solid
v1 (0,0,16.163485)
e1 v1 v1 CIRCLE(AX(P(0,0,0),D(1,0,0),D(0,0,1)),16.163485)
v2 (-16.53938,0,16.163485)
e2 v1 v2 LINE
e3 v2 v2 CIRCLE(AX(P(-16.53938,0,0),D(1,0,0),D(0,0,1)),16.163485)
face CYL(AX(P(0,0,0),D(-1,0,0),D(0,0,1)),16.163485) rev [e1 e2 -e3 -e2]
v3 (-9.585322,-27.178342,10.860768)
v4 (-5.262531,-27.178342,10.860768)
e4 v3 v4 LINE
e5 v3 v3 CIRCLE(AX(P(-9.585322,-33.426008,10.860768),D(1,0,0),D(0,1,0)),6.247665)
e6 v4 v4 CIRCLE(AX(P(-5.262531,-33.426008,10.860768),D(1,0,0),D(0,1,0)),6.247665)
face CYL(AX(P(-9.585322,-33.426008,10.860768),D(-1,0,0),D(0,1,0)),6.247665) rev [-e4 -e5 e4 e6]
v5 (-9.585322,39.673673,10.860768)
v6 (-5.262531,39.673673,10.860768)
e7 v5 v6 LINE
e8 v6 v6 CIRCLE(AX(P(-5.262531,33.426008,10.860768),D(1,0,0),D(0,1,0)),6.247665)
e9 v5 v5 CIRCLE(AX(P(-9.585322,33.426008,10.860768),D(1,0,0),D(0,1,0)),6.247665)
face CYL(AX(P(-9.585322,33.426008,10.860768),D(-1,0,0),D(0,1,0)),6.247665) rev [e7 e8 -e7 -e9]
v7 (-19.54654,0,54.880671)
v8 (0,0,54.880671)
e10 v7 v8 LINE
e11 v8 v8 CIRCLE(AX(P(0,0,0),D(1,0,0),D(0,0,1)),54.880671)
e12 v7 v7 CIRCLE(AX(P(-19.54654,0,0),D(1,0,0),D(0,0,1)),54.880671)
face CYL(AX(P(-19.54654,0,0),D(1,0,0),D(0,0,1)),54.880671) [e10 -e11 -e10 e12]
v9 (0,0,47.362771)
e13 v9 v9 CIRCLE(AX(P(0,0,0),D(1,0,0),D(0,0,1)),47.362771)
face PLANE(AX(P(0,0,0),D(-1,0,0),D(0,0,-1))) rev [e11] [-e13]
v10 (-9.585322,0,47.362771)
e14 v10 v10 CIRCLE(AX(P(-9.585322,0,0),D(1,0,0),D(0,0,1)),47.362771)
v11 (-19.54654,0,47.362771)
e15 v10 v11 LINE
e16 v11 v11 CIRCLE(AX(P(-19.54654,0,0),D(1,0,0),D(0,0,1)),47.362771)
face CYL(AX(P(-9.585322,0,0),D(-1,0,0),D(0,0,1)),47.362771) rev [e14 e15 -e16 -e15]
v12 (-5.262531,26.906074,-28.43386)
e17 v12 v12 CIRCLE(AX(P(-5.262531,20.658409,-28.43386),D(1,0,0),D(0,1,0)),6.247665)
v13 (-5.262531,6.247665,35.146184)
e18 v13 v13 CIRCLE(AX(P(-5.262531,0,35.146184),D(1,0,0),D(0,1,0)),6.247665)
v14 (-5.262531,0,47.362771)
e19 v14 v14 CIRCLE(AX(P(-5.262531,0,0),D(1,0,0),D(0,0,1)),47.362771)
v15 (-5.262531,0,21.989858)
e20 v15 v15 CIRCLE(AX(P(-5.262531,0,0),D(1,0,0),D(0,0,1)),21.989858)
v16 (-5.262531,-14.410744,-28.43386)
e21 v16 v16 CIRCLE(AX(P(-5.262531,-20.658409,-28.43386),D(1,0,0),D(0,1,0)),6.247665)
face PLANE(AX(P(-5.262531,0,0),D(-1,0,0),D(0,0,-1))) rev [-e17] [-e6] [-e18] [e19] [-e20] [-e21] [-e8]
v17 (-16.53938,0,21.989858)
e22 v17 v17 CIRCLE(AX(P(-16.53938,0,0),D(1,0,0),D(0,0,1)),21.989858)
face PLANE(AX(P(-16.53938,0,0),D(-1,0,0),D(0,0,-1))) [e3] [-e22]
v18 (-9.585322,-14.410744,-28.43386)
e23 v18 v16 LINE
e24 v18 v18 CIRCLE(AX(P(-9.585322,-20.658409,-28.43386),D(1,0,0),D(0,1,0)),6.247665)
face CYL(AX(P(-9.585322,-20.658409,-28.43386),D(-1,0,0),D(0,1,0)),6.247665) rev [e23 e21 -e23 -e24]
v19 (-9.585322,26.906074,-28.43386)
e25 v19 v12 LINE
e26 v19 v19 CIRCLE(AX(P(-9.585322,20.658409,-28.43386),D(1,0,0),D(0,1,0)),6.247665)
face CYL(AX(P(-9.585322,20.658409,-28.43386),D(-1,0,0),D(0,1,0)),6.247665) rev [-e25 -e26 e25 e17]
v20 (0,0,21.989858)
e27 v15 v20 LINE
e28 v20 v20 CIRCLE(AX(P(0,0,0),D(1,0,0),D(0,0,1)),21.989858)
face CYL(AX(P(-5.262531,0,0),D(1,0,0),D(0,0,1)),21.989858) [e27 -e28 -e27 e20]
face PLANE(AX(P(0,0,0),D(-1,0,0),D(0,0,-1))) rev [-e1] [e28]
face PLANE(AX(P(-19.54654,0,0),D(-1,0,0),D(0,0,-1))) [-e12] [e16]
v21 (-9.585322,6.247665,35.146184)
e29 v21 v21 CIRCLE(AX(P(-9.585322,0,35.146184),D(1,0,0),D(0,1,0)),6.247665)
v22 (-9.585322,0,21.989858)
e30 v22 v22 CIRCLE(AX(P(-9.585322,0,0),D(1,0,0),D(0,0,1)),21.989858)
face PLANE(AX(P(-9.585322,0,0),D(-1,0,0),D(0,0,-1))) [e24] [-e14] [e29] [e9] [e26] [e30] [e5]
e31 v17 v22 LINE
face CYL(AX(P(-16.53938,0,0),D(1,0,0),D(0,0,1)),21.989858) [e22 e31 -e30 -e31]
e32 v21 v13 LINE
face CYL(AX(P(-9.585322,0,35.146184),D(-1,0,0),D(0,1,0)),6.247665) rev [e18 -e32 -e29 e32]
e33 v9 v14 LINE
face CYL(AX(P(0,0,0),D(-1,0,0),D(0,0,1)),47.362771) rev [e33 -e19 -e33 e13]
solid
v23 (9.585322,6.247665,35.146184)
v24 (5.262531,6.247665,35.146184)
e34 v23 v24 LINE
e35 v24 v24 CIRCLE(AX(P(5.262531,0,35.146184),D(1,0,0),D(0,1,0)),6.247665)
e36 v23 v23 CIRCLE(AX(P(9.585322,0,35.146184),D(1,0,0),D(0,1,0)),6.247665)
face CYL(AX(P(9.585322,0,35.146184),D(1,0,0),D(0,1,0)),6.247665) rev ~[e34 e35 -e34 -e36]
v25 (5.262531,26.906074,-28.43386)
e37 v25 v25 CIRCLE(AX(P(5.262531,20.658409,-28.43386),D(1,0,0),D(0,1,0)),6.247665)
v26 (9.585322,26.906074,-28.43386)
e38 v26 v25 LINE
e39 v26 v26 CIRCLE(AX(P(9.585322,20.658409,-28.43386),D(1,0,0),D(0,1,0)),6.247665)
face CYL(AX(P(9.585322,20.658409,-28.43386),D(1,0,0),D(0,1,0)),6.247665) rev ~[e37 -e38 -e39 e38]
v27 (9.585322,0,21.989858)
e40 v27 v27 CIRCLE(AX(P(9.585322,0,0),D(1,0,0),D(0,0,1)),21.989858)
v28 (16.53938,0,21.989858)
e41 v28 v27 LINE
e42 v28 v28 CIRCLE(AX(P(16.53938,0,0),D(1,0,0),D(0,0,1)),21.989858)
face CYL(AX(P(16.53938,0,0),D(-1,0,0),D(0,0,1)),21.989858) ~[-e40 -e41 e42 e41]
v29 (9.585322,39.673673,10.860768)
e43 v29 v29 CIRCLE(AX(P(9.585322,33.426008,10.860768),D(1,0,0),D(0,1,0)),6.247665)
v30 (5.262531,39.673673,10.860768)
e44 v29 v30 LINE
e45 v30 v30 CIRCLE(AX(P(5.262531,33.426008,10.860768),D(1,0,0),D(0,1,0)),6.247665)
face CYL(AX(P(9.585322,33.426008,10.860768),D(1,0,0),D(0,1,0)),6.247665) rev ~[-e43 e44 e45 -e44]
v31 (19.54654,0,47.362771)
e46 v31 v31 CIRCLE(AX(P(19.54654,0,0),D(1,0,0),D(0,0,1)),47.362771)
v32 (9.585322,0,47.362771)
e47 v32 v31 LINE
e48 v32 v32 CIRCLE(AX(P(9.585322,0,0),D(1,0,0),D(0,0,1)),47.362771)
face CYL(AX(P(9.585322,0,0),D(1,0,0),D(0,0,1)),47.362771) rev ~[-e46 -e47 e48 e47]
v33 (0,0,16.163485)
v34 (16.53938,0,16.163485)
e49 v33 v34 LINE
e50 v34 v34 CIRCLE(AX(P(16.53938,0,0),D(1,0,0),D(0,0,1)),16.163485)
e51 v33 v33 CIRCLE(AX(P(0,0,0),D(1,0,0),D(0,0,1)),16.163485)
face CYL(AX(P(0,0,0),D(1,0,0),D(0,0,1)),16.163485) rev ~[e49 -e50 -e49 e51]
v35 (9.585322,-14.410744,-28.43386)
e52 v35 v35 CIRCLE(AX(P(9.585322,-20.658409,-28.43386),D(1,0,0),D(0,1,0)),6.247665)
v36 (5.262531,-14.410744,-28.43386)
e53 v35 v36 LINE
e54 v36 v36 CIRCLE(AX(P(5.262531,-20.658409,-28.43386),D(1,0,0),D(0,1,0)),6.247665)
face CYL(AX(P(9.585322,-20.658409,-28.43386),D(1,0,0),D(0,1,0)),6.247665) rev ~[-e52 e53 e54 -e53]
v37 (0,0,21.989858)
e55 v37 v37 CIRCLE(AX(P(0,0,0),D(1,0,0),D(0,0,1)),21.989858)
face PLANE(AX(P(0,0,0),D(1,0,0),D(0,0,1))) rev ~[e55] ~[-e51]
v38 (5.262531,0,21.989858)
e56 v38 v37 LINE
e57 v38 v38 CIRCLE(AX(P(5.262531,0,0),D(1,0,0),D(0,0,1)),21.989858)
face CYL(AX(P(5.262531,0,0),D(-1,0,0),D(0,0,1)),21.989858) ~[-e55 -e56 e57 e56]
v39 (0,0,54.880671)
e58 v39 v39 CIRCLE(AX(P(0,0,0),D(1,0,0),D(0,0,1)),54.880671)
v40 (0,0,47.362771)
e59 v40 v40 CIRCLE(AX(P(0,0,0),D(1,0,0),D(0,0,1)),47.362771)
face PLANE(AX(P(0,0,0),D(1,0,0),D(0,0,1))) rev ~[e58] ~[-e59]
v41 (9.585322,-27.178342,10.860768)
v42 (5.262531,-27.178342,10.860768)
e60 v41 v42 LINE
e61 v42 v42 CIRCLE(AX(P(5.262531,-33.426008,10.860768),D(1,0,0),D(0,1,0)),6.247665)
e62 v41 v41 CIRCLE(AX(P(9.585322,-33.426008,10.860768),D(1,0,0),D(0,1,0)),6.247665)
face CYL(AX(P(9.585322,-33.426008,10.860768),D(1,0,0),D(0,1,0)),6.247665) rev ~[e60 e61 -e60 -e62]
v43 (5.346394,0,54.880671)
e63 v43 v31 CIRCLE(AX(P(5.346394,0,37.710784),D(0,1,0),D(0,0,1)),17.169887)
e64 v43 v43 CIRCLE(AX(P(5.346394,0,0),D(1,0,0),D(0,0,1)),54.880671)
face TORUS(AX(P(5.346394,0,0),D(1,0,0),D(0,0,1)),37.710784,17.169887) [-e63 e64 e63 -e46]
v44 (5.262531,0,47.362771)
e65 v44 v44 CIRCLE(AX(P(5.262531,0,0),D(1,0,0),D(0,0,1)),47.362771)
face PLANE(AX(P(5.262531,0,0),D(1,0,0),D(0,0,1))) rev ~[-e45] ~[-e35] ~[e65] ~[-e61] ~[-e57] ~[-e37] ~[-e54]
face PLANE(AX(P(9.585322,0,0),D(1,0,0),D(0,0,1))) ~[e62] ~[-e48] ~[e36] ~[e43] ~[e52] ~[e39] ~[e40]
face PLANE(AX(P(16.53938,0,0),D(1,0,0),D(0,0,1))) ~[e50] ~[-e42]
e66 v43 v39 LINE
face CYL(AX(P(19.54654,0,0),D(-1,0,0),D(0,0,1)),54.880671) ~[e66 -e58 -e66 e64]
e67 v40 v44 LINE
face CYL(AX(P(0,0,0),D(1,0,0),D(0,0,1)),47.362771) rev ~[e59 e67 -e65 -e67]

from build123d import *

# Parameters (mm, degrees)
F2_R     = 6.2476650757
F3_DEPTH = 25


# Not quite as in the source:
# - a fillet or chamfer that OpenCascade refuses, or shapes differently, is made with other operations: its cross-section is extruded or revolved along the edge and cut away or added


with BuildPart() as f1:
    # F0 (on Front) → F1 (revolve)
    with BuildSketch(Plane.XZ):
        Polygon((19.546540454, 54.8806712031), (0, 54.8806712031), (0, 47.3627708852), (5.2625308745, 47.3627708852), (5.2625308745, 21.989857778), (0, 21.989857778), (0, 16.1634851247), (16.5393799543, 16.1634851247), (16.5393799543, 21.989857778), (9.5853218809, 21.989857778), (9.5853218809, 47.3627708852), (19.546540454, 47.3627708852), align=None)
    revolve(axis=Axis((6.3902153634, 0, 0), (1, 0, 0)))

    # F2 (on face) → F3 (cut)
    with BuildSketch(Plane.YZ.offset(9.5853218809)):
        with Locations((0, 35.1461842656)):
            Circle(F2_R)
        with Locations((-33.4260075687, 10.8607682255)):
            Circle(F2_R)
        with Locations((33.4260075687, 10.8607682255)):
            Circle(F2_R)
        with Locations((20.6584087857, -28.4338603583)):
            Circle(F2_R)
        with Locations((-20.6584087857, -28.4338603583)):
            Circle(F2_R)
    extrude(amount=-F3_DEPTH, mode=Mode.SUBTRACT)


with BuildPart() as f4_1:
    # F4: instance of F1
    add(f1.part.mirror(Plane.YZ))


with BuildPart() as f1_1:
    add(f1.part)

    # F5: fillet of radius 17.1698868556 on 1 edges, made by hand

    # F5_s1 → F5_t2 (revolve, cut)
    with BuildSketch(Plane.XZ):
        with BuildLine():
            ThreePointArc((5.3463936058, 54.8806712031), (13.3801193246, 52.8852453168), (19.546540454, 47.3627708852))
            Line((19.546540454, 47.3627708852), (19.830543391, 47.555810616))
            ThreePointArc((19.830543391, 47.555810616), (19.8899381911, 51.1217210442), (19.8899381911, 54.8806712031))
            Line((19.8899381911, 54.8806712031), (19.546540454, 55.2240689402))
            Line((19.546540454, 55.2240689402), (5.3463936058, 55.2240689402))
            Line((5.3463936058, 55.2240689402), (5.3463936058, 54.8806712031))
        make_face()
    revolve(axis=Axis((19.546540454, 0, 0), (1, 0, 0)), mode=Mode.SUBTRACT)


solid = Compound([f4_1.part, f1_1.part])
